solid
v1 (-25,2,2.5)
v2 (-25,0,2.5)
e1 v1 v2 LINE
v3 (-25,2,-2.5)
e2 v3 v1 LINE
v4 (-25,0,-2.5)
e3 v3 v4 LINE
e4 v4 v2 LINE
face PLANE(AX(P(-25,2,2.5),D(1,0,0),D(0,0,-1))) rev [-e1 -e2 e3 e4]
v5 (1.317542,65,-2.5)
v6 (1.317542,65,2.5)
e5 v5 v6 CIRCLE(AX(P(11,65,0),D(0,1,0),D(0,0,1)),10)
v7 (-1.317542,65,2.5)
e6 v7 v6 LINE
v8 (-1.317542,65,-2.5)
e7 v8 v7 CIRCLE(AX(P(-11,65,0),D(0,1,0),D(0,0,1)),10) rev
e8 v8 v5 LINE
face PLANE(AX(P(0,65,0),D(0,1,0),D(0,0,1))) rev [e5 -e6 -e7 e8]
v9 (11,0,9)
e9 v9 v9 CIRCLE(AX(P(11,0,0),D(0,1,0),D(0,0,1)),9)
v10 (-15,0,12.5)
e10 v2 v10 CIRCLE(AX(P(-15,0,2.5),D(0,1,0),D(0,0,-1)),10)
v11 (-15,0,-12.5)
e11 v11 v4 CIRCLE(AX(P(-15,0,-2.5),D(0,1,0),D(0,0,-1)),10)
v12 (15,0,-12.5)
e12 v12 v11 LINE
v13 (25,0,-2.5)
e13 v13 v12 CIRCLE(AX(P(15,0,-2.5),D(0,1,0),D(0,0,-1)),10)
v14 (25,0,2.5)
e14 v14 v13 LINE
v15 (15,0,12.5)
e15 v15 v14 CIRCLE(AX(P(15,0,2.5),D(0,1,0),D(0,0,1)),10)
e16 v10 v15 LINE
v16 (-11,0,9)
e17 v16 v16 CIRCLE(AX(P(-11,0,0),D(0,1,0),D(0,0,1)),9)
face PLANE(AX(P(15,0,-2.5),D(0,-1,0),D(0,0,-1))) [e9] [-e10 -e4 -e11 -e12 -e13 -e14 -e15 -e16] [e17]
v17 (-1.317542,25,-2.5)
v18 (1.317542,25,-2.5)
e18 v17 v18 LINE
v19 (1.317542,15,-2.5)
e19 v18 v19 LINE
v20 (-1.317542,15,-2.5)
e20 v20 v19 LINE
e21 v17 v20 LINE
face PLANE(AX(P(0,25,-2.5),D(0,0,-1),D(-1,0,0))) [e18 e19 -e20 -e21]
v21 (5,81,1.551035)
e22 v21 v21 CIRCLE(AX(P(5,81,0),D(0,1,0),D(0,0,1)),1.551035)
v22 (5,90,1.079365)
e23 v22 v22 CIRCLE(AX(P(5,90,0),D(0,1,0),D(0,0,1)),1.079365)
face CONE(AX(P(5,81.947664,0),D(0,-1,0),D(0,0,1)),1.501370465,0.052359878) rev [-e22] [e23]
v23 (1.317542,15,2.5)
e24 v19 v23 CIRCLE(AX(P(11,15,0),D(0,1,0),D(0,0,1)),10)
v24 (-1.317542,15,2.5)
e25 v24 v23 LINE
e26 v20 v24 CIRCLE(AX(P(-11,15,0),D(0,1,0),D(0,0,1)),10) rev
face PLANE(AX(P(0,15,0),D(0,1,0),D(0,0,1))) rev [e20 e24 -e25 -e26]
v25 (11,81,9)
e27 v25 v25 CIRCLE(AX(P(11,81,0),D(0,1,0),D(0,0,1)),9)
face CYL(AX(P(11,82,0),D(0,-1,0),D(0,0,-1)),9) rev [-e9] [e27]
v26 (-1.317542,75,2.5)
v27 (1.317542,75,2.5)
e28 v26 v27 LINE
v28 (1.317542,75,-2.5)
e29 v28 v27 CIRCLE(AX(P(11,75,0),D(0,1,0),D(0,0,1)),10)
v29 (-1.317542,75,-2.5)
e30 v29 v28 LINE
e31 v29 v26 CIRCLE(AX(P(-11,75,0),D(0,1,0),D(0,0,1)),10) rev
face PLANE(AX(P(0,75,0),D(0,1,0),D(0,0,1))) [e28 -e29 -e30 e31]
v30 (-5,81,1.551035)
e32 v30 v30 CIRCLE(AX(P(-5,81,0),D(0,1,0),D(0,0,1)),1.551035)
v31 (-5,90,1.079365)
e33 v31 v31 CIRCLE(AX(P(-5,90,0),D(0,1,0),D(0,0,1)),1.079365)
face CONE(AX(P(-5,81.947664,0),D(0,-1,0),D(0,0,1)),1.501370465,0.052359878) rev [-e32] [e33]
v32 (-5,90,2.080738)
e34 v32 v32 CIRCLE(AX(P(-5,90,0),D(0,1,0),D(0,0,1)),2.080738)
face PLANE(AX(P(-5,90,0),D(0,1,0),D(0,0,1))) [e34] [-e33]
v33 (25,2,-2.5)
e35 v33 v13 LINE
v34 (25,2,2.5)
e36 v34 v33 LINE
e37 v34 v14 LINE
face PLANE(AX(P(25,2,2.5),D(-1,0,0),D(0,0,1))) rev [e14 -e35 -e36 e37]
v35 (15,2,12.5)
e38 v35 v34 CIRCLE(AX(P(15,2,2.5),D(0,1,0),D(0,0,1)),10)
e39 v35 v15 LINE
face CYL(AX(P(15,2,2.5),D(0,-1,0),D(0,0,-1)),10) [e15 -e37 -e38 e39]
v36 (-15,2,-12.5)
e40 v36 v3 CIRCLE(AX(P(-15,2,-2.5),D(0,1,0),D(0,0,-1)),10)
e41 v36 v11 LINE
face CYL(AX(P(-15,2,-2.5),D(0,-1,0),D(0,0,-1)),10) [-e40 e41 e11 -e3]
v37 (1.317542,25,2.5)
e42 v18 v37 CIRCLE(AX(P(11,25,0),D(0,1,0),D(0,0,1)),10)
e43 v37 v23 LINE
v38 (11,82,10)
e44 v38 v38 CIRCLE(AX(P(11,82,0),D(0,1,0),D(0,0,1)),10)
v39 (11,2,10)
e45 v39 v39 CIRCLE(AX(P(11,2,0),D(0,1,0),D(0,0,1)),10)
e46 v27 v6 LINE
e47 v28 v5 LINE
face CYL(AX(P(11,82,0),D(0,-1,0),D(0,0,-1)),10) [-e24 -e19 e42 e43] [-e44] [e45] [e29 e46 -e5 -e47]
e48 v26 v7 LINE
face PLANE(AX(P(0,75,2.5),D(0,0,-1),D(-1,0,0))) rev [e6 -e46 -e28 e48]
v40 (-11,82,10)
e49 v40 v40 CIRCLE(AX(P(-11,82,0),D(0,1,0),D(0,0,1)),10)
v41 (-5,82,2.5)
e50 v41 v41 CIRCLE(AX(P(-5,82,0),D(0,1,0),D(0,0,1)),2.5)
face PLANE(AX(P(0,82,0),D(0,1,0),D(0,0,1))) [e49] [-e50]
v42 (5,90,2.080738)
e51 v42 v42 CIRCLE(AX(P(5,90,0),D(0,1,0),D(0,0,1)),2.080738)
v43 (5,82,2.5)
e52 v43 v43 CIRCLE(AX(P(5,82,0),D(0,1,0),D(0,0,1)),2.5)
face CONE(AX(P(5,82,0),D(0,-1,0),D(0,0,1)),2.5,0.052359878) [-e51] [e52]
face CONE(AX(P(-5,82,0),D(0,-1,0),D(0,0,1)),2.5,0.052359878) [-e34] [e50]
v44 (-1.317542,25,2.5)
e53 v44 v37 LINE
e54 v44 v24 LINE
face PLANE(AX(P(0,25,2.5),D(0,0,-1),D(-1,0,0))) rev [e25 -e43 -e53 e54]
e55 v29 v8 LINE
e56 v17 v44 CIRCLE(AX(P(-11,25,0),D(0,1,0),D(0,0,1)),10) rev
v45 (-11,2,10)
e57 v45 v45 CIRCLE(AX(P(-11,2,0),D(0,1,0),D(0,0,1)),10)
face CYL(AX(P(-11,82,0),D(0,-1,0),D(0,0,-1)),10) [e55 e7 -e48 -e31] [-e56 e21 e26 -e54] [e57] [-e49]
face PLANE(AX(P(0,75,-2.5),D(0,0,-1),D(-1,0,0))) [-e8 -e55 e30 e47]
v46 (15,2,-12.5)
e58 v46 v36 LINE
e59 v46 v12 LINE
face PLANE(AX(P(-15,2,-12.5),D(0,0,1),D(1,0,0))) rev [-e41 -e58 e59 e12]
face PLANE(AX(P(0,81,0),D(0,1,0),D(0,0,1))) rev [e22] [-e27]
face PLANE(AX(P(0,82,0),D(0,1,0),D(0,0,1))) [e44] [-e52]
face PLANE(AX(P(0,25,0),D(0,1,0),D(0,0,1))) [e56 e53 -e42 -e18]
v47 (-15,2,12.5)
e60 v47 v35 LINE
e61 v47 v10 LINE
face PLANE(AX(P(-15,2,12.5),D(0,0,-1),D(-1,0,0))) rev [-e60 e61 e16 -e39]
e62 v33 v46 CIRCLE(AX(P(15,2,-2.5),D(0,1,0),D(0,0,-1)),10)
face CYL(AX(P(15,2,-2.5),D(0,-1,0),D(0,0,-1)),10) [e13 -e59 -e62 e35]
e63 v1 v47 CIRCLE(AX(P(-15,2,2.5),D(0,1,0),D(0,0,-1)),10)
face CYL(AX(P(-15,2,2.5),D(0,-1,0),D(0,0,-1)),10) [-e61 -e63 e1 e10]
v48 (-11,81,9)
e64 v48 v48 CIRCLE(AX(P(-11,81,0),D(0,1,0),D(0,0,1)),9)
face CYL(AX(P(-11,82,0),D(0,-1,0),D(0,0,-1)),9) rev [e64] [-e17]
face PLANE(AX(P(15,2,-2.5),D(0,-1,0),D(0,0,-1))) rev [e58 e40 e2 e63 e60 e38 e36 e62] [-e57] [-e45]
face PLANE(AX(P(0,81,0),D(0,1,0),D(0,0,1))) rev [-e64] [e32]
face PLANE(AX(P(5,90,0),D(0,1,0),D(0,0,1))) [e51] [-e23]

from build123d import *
from build123d.topology import SkipClean

# Parameters (mm, degrees)
BOSS_EXTRUDE1_DEPTH           = 2
BOSS_EXTRUDE2_DEPTH           = 80
SKETCH3_R                     = 2.5
BOSS_EXTRUDE3_DEPTH           = 8
BOSS_EXTRUDE3_DRAFT           = 3
BOSS_EXTRUDE3_PROFILE_2_DEPTH = 8
BOSS_EXTRUDE3_PROFILE_2_DRAFT = 3
SHELL2_START                  = 1
SHELL2_OUTLINE_R              = 9
SHELL2_DEPTH                  = 80
CUT_EXTRUDE1_DEPTH            = 93.332280474
BOSS_EXTRUDE4_DEPTH           = 5
BOSS_EXTRUDE5_DEPTH           = 5


with BuildPart() as part:
    # Sketch1 → Boss-Extrude1 (new body)
    with BuildSketch(Plane(origin=(0, 0, 0), x_dir=(1, 0, 0), z_dir=(0, 1, 0))):
        with BuildLine():
            Line((-15, -12.5), (15, -12.5))
            ThreePointArc((15, -12.5), (22.071067812, -9.571067812), (25, -2.5))
            Line((25, -2.5), (25, 2.5))
            ThreePointArc((25, 2.5), (22.071067812, 9.571067812), (15, 12.5))
            Line((15, 12.5), (-15, 12.5))
            ThreePointArc((-15, 12.5), (-22.071067812, 9.571067812), (-25, 2.5))
            Line((-25, 2.5), (-25, -2.5))
            ThreePointArc((-25, -2.5), (-22.071067812, -9.571067812), (-15, -12.5))
        make_face()
    extrude(amount=BOSS_EXTRUDE1_DEPTH)

    # Sketch2 → Boss-Extrude2 (add)
    with BuildSketch(Plane(origin=(0, 2, 0), x_dir=(1, 0, 0), z_dir=(0, 1, 0))):
        with BuildLine():
            ThreePointArc((-20, 0), (-11, 9), (-2, 0))
            Line((-2, 0), (-1, 0))
            ThreePointArc((-1, 0), (-11, 10), (-21, 0))
            Line((-21, 0), (-20, 0))
        make_face()
        with BuildLine():
            Line((-1, 0), (-2, 0))
            ThreePointArc((-2, 0), (-11, -9), (-20, 0))
            Line((-20, 0), (-21, 0))
            ThreePointArc((-21, 0), (-11, -10), (-1, 0))
        make_face()
        with BuildLine():
            ThreePointArc((21, 0), (11, 10), (1, 0))
            Line((1, 0), (2, 0))
            ThreePointArc((2, 0), (11, 9), (20, 0))
            Line((20, 0), (21, 0))
        make_face()
        with BuildLine():
            Line((2, 0), (1, 0))
            ThreePointArc((1, 0), (11, -10), (21, 0))
            Line((21, 0), (20, 0))
            ThreePointArc((20, 0), (11, -9), (2, 0))
        make_face()
        with BuildLine():
            ThreePointArc((20, 0), (11, 9), (2, 0))
            Line((2, 0), (20, 0))
        make_face()
        with BuildLine():
            Line((20, 0), (2, 0))
            ThreePointArc((2, 0), (11, -9), (20, 0))
        make_face()
        with BuildLine():
            ThreePointArc((-20, 0), (-11, -9), (-2, 0))
            Line((-2, 0), (-20, 0))
        make_face()
        with BuildLine():
            Line((-20, 0), (-2, 0))
            ThreePointArc((-2, 0), (-11, 9), (-20, 0))
        make_face()
    extrude(amount=BOSS_EXTRUDE2_DEPTH)


with BuildPart() as boss_extrude3_tool:
    # Sketch3 → Boss-Extrude3 (with draft: the straight prism first)
    with BuildSketch(Plane(origin=(0, 82, 0), x_dir=(1, 0, 0), z_dir=(0, 1, 0))):
        with Locations((-5, 0)):
            Circle(SKETCH3_R)
    extrude(amount=BOSS_EXTRUDE3_DEPTH)
    # Boss-Extrude3: the draft: its side faces are tilted about the plane it starts from
    boss_extrude3_sides = [boss_extrude3_tool.faces().sort_by_distance(p)[0] for p in [
        (-7.5, 86, 0),
    ]]
    draft(boss_extrude3_sides, Plane(origin=(0, 82, 0), x_dir=(1, 0, 0), z_dir=(0, 1, 0)), BOSS_EXTRUDE3_DRAFT)


with BuildPart() as part_1:
    add(part.part)

    # Boss-Extrude3: add boss_extrude3_tool
    add(boss_extrude3_tool.part)


with BuildPart() as boss_extrude3_profile_2_tool:
    # Sketch3 → Boss-Extrude3 profile 2 (with draft: the straight prism first)
    with BuildSketch(Plane(origin=(0, 82, 0), x_dir=(1, 0, 0), z_dir=(0, 1, 0))):
        with Locations((5, 0)):
            Circle(SKETCH3_R)
    extrude(amount=BOSS_EXTRUDE3_PROFILE_2_DEPTH)
    # Boss-Extrude3 profile 2: the draft: its side faces are tilted about the plane it starts from
    boss_extrude3_profile_2_sides = [boss_extrude3_profile_2_tool.faces().sort_by_distance(p)[0] for p in [
        (2.5, 86, 0),
    ]]
    draft(boss_extrude3_profile_2_sides, Plane(origin=(0, 82, 0), x_dir=(1, 0, 0), z_dir=(0, 1, 0)), BOSS_EXTRUDE3_PROFILE_2_DRAFT)


with BuildPart() as part_2:
    add(part_1.part)

    # Boss-Extrude3 profile 2: add boss_extrude3_profile_2_tool
    add(boss_extrude3_profile_2_tool.part)

    # Shell2: read off the stored shape, not the designer's step
    # Shell2 outline → Shell2 (cut)
    with BuildSketch(Plane(origin=(0, 0, 0), x_dir=(1, 0, 0), z_dir=(0, 1, 0)).offset(SHELL2_START)):
        with Locations((11, 0)):
            Circle(SHELL2_OUTLINE_R)
        with Locations((-11, 0)):
            Circle(SHELL2_OUTLINE_R)
    extrude(amount=SHELL2_DEPTH, mode=Mode.SUBTRACT)

    # Shell2 2: loft between two sections, ruled curve by curve
    shell2_2_from = [
        Edge.make_three_point_arc((5, 90, 1.07936542), (3.92063458, 90, 0), (5, 90, -1.07936542)),
        Edge.make_three_point_arc((5, 90, -1.07936542), (6.07936542, 90, 0), (5, 90, 1.07936542)),
    ]
    shell2_2_to = [
        Edge.make_three_point_arc((5, 81, 1.551035433), (3.448964567, 81, 0), (5, 81, -1.551035433)),
        Edge.make_three_point_arc((5, 81, -1.551035433), (6.551035433, 81, 0), (5, 81, 1.551035433)),
    ]
    shell2_2 = Solid(Shell([*[Face.make_surface_from_curves(shell2_2_from[k], shell2_2_to[k]) for k in range(2)], Face(Wire(shell2_2_from)), Face(Wire(shell2_2_to))]))
    add(shell2_2, mode=Mode.SUBTRACT)

    # Shell2 3: loft between two sections, ruled curve by curve
    shell2_3_from = [
        Edge.make_three_point_arc((-5, 90, 1.07936542), (-6.07936542, 90, 0), (-5, 90, -1.07936542)),
        Edge.make_three_point_arc((-5, 90, -1.07936542), (-3.92063458, 90, 0), (-5, 90, 1.07936542)),
    ]
    shell2_3_to = [
        Edge.make_three_point_arc((-5, 81, 1.551035433), (-6.551035433, 81, 0), (-5, 81, -1.551035433)),
        Edge.make_three_point_arc((-5, 81, -1.551035433), (-3.448964567, 81, 0), (-5, 81, 1.551035433)),
    ]
    shell2_3 = Solid(Shell([*[Face.make_surface_from_curves(shell2_3_from[k], shell2_3_to[k]) for k in range(2)], Face(Wire(shell2_3_from)), Face(Wire(shell2_3_to))]))
    add(shell2_3, mode=Mode.SUBTRACT)

    # Sketch2<3> → Cut-Extrude1 (cut, through all)
    with SkipClean():  # the faces are left unmerged after this step: merging them gives an invalid solid
        with BuildSketch(Plane(origin=(0, 2, 0), x_dir=(1, 0, 0), z_dir=(0, 1, 0))):
            with BuildLine():
                ThreePointArc((-20, 0), (-11, -9), (-2, 0))
                Line((-2, 0), (-20, 0))
            make_face()
            with BuildLine():
                Line((-20, 0), (-2, 0))
                ThreePointArc((-2, 0), (-11, 9), (-20, 0))
            make_face()
            with BuildLine():
                ThreePointArc((20, 0), (11, 9), (2, 0))
                Line((2, 0), (20, 0))
            make_face()
            with BuildLine():
                Line((20, 0), (2, 0))
                ThreePointArc((2, 0), (11, -9), (20, 0))
            make_face()
        extrude(amount=-CUT_EXTRUDE1_DEPTH, mode=Mode.SUBTRACT)

    # Sketch4 → Boss-Extrude4 (add, symmetric)
    with SkipClean():  # the faces are left unmerged after this step: merging them gives an invalid solid
        with BuildSketch(Plane(origin=(0, 20, 0), x_dir=(1, 0, 0), z_dir=(0, 1, 0))):
            with BuildLine():
                Line((1, 0), (-1, 0))
                ThreePointArc((-1, 0), (-1.079703037, -1.260042925), (-1.317541634, -2.5))
                Line((-1.317541634, -2.5), (1.317541634, -2.5))
                ThreePointArc((1.317541634, -2.5), (1.079703037, -1.260042925), (1, 0))
            make_face()
            with BuildLine():
                ThreePointArc((-1.317541634, 2.5), (-1.079703037, 1.260042925), (-1, 0))
                Line((-1, 0), (1, 0))
                ThreePointArc((1, 0), (1.079703037, 1.260042925), (1.317541634, 2.5))
                Line((1.317541634, 2.5), (-1.317541634, 2.5))
            make_face()
        extrude(amount=BOSS_EXTRUDE4_DEPTH, both=True)

    # Sketch7 → Boss-Extrude5 (add, symmetric)
    with SkipClean():  # the faces are left unmerged after this step: merging them gives an invalid solid
        with BuildSketch(Plane(origin=(0, 70, 0), x_dir=(1, 0, 0), z_dir=(0, 1, 0))):
            with BuildLine():
                ThreePointArc((-1.317541634, 2.5), (-1.079703037, 1.260042925), (-1, 0))
                Line((-1, 0), (1, 0))
                ThreePointArc((1, 0), (1.079703037, 1.260042925), (1.317541634, 2.5))
                Line((1.317541634, 2.5), (-1.317541634, 2.5))
            make_face()
            with BuildLine():
                Line((1, 0), (-1, 0))
                ThreePointArc((-1, 0), (-1.079703037, -1.260042925), (-1.317541634, -2.5))
                Line((-1.317541634, -2.5), (1.317541634, -2.5))
                ThreePointArc((1.317541634, -2.5), (1.079703037, -1.260042925), (1, 0))
            make_face()
        extrude(amount=BOSS_EXTRUDE5_DEPTH, both=True)


solid = part_2.part
